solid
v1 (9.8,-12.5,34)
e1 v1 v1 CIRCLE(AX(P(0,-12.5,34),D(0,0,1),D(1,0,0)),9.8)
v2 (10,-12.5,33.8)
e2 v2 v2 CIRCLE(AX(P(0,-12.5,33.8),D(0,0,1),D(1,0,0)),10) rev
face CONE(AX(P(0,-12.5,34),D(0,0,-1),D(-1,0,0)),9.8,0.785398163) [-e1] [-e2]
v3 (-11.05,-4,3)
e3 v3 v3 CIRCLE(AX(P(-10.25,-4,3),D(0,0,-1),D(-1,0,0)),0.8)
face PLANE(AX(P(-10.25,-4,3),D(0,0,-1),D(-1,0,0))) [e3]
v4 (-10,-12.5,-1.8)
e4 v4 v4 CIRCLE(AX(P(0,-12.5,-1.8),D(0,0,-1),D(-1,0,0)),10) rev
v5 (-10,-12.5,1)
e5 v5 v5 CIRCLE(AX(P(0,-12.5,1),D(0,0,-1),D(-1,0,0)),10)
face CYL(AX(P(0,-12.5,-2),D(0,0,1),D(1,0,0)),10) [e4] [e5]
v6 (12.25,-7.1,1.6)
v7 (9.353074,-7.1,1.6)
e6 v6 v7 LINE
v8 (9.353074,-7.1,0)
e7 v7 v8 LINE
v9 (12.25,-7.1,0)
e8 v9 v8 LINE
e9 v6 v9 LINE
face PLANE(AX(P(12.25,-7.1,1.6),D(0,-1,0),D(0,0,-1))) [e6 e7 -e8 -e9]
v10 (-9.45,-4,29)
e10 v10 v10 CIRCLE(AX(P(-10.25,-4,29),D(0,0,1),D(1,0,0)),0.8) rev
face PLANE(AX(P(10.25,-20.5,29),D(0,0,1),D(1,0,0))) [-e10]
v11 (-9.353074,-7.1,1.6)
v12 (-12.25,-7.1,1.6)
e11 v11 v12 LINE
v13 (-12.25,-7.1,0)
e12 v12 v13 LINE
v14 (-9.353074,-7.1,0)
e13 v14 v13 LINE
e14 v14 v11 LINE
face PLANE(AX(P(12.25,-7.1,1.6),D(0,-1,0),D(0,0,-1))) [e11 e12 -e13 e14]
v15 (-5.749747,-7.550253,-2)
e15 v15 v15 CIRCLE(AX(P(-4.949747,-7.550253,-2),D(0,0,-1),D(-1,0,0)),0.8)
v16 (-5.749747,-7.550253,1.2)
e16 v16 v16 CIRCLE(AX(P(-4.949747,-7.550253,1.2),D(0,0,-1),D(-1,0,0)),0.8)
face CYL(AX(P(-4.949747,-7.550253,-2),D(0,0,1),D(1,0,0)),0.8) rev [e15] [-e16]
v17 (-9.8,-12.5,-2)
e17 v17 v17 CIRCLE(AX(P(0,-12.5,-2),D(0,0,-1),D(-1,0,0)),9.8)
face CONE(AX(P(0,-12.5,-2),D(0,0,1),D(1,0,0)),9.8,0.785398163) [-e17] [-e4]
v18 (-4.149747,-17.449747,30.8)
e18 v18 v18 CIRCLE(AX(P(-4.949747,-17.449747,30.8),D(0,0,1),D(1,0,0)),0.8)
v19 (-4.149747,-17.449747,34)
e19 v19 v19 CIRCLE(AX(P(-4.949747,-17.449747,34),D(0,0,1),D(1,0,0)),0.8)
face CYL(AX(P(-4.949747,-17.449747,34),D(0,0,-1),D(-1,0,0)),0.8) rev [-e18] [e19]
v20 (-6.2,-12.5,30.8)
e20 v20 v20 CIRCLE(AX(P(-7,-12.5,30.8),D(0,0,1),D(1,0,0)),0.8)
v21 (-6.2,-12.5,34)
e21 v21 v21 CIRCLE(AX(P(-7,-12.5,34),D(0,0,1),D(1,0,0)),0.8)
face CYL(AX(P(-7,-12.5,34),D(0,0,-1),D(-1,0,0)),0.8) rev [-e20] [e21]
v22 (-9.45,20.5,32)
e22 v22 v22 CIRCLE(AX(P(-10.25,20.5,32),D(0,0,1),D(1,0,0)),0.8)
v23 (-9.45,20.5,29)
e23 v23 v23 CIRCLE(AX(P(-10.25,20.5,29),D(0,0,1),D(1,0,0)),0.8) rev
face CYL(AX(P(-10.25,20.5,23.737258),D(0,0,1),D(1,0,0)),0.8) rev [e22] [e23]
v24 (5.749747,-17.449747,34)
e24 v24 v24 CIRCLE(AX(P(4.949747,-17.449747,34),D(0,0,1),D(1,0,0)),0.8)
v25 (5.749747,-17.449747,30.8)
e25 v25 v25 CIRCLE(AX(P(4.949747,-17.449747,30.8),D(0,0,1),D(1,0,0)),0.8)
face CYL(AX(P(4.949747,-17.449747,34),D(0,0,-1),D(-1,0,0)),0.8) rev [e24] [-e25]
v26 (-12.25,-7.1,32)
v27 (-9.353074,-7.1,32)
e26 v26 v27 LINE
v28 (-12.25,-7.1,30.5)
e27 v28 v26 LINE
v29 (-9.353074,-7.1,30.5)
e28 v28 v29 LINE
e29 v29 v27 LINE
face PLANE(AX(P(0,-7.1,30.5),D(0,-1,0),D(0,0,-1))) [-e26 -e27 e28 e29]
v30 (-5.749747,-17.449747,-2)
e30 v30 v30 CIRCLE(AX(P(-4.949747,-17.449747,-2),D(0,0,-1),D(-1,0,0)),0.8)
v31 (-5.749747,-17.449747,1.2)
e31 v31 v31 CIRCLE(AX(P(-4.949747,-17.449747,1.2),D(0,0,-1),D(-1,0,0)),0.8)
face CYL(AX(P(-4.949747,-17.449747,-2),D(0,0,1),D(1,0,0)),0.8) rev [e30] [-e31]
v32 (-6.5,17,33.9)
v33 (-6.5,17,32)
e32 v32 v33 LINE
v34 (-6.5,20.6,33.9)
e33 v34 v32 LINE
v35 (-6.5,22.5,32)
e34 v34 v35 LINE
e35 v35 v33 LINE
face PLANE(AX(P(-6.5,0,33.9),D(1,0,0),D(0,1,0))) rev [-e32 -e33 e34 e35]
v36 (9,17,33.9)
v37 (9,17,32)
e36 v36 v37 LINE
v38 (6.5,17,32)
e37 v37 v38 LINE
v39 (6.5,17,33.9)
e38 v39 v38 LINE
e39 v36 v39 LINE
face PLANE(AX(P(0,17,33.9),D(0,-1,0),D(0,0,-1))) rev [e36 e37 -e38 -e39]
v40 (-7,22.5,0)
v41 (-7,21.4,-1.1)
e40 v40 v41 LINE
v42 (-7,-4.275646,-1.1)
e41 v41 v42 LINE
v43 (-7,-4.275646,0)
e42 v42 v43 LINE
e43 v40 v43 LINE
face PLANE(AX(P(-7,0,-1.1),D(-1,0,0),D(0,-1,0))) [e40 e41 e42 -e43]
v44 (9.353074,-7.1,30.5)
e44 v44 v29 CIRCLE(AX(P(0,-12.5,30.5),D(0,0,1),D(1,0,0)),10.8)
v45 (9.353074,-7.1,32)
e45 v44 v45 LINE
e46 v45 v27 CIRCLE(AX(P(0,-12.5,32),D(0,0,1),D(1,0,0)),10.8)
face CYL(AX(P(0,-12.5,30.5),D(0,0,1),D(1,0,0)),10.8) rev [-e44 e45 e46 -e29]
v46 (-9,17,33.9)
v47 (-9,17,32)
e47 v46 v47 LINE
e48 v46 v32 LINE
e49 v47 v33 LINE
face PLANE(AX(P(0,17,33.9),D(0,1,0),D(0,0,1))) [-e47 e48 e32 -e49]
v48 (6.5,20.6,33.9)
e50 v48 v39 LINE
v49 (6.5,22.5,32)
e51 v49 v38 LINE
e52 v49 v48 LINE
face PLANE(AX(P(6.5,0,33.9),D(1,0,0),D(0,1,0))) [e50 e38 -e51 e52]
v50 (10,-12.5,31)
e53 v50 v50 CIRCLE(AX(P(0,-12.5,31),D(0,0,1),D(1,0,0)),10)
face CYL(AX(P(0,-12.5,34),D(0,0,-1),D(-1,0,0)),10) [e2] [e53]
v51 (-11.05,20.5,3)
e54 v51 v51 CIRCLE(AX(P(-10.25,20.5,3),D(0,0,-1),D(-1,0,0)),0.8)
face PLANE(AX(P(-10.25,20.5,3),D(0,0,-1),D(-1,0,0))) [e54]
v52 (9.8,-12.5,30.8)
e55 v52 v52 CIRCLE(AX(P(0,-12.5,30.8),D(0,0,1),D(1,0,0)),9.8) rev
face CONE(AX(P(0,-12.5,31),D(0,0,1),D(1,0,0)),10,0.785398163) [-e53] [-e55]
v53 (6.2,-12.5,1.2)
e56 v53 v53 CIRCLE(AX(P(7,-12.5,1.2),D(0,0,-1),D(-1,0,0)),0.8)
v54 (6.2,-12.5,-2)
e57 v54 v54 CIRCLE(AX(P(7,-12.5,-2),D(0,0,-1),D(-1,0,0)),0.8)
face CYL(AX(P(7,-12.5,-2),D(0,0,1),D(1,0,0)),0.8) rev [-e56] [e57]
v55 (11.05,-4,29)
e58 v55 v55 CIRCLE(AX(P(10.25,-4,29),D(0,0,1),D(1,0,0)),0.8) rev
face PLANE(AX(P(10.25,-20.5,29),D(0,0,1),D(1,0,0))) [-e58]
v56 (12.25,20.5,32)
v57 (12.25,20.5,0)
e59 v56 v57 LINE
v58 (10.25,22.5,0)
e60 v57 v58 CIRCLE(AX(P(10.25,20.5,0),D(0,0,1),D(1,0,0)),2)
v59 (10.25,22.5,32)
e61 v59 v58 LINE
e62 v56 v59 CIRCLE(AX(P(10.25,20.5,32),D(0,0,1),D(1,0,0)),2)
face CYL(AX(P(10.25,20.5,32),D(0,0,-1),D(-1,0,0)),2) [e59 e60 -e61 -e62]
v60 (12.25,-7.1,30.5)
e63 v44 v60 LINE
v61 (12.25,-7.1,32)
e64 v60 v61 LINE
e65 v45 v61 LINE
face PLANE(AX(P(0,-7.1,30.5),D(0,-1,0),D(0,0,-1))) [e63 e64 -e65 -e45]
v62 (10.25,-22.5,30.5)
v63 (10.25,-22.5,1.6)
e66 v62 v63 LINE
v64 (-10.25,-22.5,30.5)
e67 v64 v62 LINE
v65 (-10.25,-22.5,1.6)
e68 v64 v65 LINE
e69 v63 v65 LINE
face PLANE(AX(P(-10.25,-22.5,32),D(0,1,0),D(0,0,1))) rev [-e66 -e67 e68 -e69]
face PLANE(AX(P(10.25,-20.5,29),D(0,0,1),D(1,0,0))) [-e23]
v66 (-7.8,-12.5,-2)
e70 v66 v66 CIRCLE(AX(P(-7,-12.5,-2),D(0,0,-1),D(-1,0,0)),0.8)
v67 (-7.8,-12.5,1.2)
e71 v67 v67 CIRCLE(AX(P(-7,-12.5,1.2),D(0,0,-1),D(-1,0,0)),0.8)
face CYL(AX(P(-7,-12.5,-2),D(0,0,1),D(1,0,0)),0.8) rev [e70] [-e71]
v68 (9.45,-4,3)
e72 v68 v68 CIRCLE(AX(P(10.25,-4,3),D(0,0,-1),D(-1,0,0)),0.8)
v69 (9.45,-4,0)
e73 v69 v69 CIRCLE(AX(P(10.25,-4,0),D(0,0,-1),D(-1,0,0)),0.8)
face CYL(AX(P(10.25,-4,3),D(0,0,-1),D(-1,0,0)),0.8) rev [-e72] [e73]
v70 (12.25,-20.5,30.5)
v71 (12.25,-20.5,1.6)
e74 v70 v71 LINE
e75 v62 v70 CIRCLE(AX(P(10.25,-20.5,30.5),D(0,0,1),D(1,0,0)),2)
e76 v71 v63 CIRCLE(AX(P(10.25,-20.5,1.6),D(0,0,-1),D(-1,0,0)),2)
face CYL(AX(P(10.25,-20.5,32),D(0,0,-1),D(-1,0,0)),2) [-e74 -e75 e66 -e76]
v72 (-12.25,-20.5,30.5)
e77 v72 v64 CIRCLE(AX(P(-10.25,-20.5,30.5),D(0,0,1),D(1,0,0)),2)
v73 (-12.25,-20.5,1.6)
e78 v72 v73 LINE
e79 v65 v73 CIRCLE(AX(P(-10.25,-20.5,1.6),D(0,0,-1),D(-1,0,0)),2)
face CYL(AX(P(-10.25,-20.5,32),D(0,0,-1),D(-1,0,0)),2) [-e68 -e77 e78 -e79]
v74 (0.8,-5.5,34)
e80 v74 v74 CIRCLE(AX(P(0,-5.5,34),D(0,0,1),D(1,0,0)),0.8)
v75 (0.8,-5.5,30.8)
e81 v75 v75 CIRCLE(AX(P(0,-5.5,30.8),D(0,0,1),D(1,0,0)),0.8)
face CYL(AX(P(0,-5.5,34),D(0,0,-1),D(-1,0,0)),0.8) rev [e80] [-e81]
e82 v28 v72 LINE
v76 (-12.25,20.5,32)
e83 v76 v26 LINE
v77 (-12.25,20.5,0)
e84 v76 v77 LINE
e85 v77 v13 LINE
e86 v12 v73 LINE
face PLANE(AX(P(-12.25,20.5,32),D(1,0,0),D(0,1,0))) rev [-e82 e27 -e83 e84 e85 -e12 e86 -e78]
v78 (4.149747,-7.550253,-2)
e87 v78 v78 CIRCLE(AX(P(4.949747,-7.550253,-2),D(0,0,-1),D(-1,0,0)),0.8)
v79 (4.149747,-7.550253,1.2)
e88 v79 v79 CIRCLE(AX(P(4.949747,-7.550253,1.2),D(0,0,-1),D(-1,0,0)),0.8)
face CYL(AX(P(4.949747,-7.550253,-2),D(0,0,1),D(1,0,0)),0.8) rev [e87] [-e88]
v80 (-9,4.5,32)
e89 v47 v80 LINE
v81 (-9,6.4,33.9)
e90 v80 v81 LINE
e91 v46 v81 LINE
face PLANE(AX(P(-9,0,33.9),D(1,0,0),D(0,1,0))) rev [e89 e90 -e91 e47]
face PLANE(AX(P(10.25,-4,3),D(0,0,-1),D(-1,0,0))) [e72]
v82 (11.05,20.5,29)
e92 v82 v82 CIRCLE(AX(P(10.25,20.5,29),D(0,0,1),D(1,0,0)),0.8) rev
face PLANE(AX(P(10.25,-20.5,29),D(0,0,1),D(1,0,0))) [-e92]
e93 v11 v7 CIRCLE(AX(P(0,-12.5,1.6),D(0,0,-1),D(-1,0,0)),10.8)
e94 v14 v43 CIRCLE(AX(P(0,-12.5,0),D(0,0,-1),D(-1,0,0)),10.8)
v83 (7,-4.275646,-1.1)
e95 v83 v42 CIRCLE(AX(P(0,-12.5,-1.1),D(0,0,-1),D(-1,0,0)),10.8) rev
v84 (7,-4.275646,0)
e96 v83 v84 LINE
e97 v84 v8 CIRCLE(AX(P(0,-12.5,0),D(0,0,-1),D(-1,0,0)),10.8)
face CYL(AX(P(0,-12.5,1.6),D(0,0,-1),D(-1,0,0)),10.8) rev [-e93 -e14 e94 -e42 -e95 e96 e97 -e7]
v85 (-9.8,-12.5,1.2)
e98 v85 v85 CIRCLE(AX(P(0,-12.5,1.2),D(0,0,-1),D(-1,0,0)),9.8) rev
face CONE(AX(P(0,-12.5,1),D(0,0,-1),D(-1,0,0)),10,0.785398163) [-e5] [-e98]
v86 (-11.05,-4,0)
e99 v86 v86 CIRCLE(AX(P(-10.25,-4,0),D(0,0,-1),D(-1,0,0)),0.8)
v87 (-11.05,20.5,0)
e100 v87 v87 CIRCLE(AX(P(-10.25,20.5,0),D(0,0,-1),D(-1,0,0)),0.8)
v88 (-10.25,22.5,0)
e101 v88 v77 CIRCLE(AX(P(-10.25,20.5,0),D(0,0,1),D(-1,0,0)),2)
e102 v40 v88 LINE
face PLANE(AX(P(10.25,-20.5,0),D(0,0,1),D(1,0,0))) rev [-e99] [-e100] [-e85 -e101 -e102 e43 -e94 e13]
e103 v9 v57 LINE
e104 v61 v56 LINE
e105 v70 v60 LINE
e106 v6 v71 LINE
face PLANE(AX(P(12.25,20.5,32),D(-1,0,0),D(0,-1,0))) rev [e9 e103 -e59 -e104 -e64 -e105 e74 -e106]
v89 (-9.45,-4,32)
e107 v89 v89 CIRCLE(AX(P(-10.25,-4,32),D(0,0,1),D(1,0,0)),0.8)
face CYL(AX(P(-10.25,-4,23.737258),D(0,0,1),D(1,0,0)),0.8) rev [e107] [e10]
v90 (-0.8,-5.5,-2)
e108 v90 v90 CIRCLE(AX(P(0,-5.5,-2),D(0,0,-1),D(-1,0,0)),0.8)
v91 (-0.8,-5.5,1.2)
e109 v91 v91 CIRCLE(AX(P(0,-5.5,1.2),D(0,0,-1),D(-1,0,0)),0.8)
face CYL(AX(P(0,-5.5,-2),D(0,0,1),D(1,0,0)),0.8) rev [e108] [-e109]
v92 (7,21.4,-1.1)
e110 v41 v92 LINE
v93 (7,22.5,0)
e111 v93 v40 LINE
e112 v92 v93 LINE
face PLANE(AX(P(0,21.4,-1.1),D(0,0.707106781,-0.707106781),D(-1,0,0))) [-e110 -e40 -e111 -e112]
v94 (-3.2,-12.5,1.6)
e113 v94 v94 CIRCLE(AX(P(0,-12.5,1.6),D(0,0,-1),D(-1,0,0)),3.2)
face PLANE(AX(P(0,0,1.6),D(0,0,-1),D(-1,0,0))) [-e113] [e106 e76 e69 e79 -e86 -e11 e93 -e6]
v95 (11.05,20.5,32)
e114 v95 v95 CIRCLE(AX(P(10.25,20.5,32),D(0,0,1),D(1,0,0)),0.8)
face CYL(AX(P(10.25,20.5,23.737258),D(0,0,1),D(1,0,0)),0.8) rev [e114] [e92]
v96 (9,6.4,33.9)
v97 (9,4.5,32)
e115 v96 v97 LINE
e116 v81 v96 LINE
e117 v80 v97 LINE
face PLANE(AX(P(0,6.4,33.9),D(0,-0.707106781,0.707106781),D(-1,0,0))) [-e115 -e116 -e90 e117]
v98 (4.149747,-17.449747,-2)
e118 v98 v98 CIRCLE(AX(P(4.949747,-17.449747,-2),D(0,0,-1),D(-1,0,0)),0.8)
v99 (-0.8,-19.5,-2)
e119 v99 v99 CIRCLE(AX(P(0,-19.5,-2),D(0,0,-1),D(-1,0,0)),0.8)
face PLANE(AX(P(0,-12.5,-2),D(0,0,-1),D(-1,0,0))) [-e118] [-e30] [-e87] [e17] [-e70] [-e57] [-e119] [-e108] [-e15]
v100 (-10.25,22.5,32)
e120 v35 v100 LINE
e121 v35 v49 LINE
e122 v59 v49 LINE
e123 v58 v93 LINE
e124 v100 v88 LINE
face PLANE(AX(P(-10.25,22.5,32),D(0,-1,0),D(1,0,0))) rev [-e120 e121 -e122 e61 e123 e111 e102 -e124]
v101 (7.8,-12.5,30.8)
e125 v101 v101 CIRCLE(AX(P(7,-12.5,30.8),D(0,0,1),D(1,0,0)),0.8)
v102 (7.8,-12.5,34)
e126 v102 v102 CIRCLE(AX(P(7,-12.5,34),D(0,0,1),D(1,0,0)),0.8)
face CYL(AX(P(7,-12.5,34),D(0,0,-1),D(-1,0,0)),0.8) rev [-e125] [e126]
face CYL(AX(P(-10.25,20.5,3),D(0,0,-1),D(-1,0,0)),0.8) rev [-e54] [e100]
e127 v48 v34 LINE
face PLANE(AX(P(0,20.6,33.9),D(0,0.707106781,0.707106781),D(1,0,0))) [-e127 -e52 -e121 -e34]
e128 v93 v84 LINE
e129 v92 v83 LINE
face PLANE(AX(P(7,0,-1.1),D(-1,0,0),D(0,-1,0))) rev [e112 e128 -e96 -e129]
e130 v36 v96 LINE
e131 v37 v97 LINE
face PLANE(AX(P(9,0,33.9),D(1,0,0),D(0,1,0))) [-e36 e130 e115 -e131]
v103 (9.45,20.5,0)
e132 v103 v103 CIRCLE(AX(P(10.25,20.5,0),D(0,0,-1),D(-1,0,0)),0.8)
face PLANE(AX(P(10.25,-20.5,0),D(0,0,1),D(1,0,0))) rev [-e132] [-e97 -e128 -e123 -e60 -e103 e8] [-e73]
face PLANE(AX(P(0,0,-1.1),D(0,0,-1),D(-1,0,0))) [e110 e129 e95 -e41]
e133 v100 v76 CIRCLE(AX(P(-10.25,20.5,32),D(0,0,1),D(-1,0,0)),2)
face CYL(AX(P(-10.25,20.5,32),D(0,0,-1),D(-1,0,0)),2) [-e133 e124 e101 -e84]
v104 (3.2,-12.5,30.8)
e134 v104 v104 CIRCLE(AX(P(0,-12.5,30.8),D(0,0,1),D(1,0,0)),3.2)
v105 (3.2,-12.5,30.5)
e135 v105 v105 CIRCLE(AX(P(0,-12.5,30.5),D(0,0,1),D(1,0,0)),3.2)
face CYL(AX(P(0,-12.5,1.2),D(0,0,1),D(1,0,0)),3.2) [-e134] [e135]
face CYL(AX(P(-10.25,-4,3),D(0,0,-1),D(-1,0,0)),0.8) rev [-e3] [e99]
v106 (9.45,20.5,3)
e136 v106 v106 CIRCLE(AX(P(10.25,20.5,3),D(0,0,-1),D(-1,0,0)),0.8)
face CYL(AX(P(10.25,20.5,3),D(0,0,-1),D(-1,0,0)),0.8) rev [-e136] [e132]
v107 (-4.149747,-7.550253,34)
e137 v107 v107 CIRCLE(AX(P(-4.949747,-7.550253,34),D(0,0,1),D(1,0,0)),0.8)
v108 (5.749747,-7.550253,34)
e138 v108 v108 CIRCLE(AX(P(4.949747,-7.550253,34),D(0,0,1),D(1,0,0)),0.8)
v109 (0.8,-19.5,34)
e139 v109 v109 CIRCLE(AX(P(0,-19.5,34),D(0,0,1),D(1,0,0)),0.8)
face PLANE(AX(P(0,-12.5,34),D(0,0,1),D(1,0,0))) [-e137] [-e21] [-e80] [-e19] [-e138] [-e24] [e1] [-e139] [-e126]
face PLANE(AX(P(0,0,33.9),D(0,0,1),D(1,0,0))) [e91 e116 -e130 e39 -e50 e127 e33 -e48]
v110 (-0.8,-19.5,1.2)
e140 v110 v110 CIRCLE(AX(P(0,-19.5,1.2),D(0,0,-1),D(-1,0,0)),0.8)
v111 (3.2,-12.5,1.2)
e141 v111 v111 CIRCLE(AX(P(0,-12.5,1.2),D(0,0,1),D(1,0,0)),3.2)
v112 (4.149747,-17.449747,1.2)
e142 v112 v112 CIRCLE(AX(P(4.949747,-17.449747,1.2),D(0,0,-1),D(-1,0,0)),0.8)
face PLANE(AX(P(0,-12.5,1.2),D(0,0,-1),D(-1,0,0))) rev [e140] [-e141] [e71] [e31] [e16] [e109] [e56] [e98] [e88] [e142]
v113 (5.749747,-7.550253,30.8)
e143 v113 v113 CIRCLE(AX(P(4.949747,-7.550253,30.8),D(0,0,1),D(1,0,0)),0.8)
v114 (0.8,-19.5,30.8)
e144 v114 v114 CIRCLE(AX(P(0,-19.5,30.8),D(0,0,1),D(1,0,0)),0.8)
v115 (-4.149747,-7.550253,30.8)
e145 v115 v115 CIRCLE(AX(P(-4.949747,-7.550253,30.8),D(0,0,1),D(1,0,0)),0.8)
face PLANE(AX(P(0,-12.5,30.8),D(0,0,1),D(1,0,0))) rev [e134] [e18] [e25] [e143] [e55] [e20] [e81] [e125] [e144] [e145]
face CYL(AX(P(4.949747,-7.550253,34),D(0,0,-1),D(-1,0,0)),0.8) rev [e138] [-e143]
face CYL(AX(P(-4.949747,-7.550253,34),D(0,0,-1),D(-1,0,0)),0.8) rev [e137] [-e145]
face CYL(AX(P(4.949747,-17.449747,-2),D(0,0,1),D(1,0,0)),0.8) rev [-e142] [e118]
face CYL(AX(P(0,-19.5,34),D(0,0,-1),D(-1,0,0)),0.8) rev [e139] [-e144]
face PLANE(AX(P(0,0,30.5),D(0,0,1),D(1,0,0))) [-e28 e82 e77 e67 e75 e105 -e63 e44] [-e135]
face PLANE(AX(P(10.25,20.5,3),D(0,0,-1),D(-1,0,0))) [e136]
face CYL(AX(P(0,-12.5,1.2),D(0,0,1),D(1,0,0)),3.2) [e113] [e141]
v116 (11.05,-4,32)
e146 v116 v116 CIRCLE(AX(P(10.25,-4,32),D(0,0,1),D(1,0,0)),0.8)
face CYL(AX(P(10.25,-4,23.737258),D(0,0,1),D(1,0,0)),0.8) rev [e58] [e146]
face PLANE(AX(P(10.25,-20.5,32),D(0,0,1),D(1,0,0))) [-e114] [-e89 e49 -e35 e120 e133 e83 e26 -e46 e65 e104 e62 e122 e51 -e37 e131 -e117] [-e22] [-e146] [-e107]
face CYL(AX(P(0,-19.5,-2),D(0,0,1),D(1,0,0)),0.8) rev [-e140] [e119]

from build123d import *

# Parameters (mm, degrees)
BOSS_EXTRUDE1_DEPTH      = 32
CUT_EXTRUDE1_START       = -1.5
CUT_EXTRUDE1_DEPTH       = 1.5
SKETCH3_R                = 10.8
SKETCH3_W                = 24.5
SKETCH3_H                = 15.4
CUT_EXTRUDE2_DEPTH       = 1.6
BOSS_EXTRUDE2_DEPTH      = 0.3
BOSS_EXTRUDE2_DEPTH_BACK = 29.3
SKETCH4_R                = 3.2
SKETCH5_R                = 10
SKETCH5_R_2              = 0.8
BOSS_EXTRUDE3_DEPTH      = 3.2
BOSS_EXTRUDE5_START      = 3.2
SKETCH6_R                = 10
SKETCH6_R_2              = 0.8
BOSS_EXTRUDE5_DEPTH      = 3.2
BOSS_EXTRUDE6_DEPTH      = 1.9
CHAMFER1_SIZE            = 1.9
BOSS_EXTRUDE7_START      = 1.1
BOSS_EXTRUDE7_DEPTH      = 1.1
CHAMFER2_SIZE            = 1.1
SKETCH9_R                = 0.8
CUT_EXTRUDE3_DEPTH       = 3
CUT_EXTRUDE4_START       = -3
SKETCH10_R               = 0.8
CUT_EXTRUDE4_DEPTH       = 3
CHAMFER3_SIZE            = 0.2


with BuildPart() as part:
    # Sketch1 → Boss-Extrude1 (new body)
    with BuildSketch(Plane.XY):
        with BuildLine():
            Line((-10.25, 22.5), (10.25, 22.5))
            ThreePointArc((10.25, 22.5), (11.664213562, 21.914213562), (12.25, 20.5))
            Line((12.25, 20.5), (12.25, -20.5))
            ThreePointArc((12.25, -20.5), (11.664213562, -21.914213562), (10.25, -22.5))
            Line((10.25, -22.5), (-10.25, -22.5))
            ThreePointArc((-10.25, -22.5), (-11.664213562, -21.914213562), (-12.25, -20.5))
            Line((-12.25, -20.5), (-12.25, 20.5))
            ThreePointArc((-12.25, 20.5), (-11.664213562, 21.914213562), (-10.25, 22.5))
        make_face()
    extrude(amount=BOSS_EXTRUDE1_DEPTH)

    # Sketch2 → Cut-Extrude1 (cut)
    with BuildSketch(Plane.XY.offset(32).offset(CUT_EXTRUDE1_START)):
        with BuildLine():
            ThreePointArc((9.353074361, -7.1), (0, -1.7), (-9.353074361, -7.1))
            Line((-9.353074361, -7.1), (9.353074361, -7.1))
        make_face()
        with BuildLine():
            Line((9.353074361, -7.1), (-9.353074361, -7.1))
            ThreePointArc((-9.353074361, -7.1), (-10.217465609, -15.99905652), (-4.079215611, -22.5))
            Line((-4.079215611, -22.5), (4.079215611, -22.5))
            ThreePointArc((4.079215611, -22.5), (8.963691444, -18.524303752), (10.8, -12.5))
            ThreePointArc((10.8, -12.5), (10.431998924, -9.704754313), (9.353074361, -7.1))
        make_face()
        with BuildLine():
            Line((12.25, -7.1), (9.353074361, -7.1))
            ThreePointArc((9.353074361, -7.1), (10.431998924, -9.704754313), (10.8, -12.5))
            ThreePointArc((10.8, -12.5), (8.963691444, -18.524303752), (4.079215611, -22.5))
            Line((4.079215611, -22.5), (10.25, -22.5))
            ThreePointArc((10.25, -22.5), (11.664213562, -21.914213562), (12.25, -20.5))
            Line((12.25, -20.5), (12.25, -7.1))
        make_face()
        with BuildLine():
            Line((-9.353074361, -7.1), (-12.25, -7.1))
            Line((-12.25, -7.1), (-12.25, -20.5))
            ThreePointArc((-12.25, -20.5), (-11.664213562, -21.914213562), (-10.25, -22.5))
            Line((-10.25, -22.5), (-4.079215611, -22.5))
            ThreePointArc((-4.079215611, -22.5), (-10.217465609, -15.99905652), (-9.353074361, -7.1))
        make_face()
    extrude(amount=CUT_EXTRUDE1_DEPTH, mode=Mode.SUBTRACT)

    # Sketch3 → Cut-Extrude2 (cut)
    with BuildSketch(Plane(origin=(0, 0, 0), x_dir=(-1, 0, 0), z_dir=(0, 0, -1))):
        with Locations((0, -12.5)):
            Circle(SKETCH3_R)
        with Locations((0, -14.8)):
            Rectangle(SKETCH3_W, SKETCH3_H)
    extrude(amount=-CUT_EXTRUDE2_DEPTH, mode=Mode.SUBTRACT)

    # Sketch4 → Boss-Extrude2 (add, two sides: drawn at the far end of the back side and taken through both)
    with BuildSketch(Plane.XY.offset(30.5).offset(-BOSS_EXTRUDE2_DEPTH_BACK)):
        with Locations((0, -12.5)):
            Circle(SKETCH4_R)
    extrude(amount=BOSS_EXTRUDE2_DEPTH + BOSS_EXTRUDE2_DEPTH_BACK)

    # Sketch5 → Boss-Extrude3 (add)
    with BuildSketch(Plane.XY.offset(30.8)):
        with Locations((0, -12.5)):
            Circle(SKETCH5_R)
        with Locations((0, -5.5)):
            Circle(SKETCH5_R_2, mode=Mode.SUBTRACT)
        with Locations((4.949747468, -7.550252532)):
            Circle(SKETCH5_R_2, mode=Mode.SUBTRACT)
        with Locations((7, -12.5)):
            Circle(SKETCH5_R_2, mode=Mode.SUBTRACT)
        with Locations((4.949747468, -17.449747468)):
            Circle(SKETCH5_R_2, mode=Mode.SUBTRACT)
        with Locations((0, -19.5)):
            Circle(SKETCH5_R_2, mode=Mode.SUBTRACT)
        with Locations((-4.949747468, -17.449747468)):
            Circle(SKETCH5_R_2, mode=Mode.SUBTRACT)
        with Locations((-7, -12.5)):
            Circle(SKETCH5_R_2, mode=Mode.SUBTRACT)
        with Locations((-4.949747468, -7.550252532)):
            Circle(SKETCH5_R_2, mode=Mode.SUBTRACT)
    extrude(amount=BOSS_EXTRUDE3_DEPTH)

    # Sketch6 → Boss-Extrude5 (add)
    with BuildSketch(Plane(origin=(0, 0, 1.2), x_dir=(-1, 0, 0), z_dir=(0, 0, -1)).offset(BOSS_EXTRUDE5_START)):
        with Locations(Location((0, -12.5, 0), (0, 0, 180))):
            Circle(SKETCH6_R)
        with Locations(Location((0, -5.5, 0), (0, 0, 180))):
            Circle(SKETCH6_R_2, mode=Mode.SUBTRACT)
        with Locations(Location((4.949747468, -7.550252532, 0), (0, 0, 180))):
            Circle(SKETCH6_R_2, mode=Mode.SUBTRACT)
        with Locations(Location((7, -12.5, 0), (0, 0, 180))):
            Circle(SKETCH6_R_2, mode=Mode.SUBTRACT)
        with Locations(Location((4.949747468, -17.449747468, 0), (0, 0, 180))):
            Circle(SKETCH6_R_2, mode=Mode.SUBTRACT)
        with Locations(Location((0, -19.5, 0), (0, 0, 180))):
            Circle(SKETCH6_R_2, mode=Mode.SUBTRACT)
        with Locations(Location((-4.949747468, -17.449747468, 0), (0, 0, 180))):
            Circle(SKETCH6_R_2, mode=Mode.SUBTRACT)
        with Locations(Location((-7, -12.5, 0), (0, 0, 180))):
            Circle(SKETCH6_R_2, mode=Mode.SUBTRACT)
        with Locations(Location((-4.949747468, -7.550252532, 0), (0, 0, 180))):
            Circle(SKETCH6_R_2, mode=Mode.SUBTRACT)
    extrude(amount=-BOSS_EXTRUDE5_DEPTH)

    # Sketch7 → Boss-Extrude6 (add)
    with BuildSketch(Plane.XY.offset(32)):
        Polygon((6.5, 22.5), (-6.5, 22.5), (-6.5, 17), (-9, 17), (-9, 4.5), (9, 4.5), (9, 17), (6.5, 17), align=None)
    extrude(amount=BOSS_EXTRUDE6_DEPTH)

    # Chamfer1
    chamfer1_edges = [part.edges().sort_by_distance(p)[0] for p in [
        (0, 22.5, 33.9),
        (0, 4.5, 33.9),
    ]]
    chamfer(chamfer1_edges, length=CHAMFER1_SIZE - 0.0001)  # a hair under: the kernel refuses the full size

    # Sketch8 → Boss-Extrude7 (add)
    with BuildSketch(Plane(origin=(0, 0, 0), x_dir=(-1, 0, 0), z_dir=(0, 0, -1)).offset(BOSS_EXTRUDE7_START)):
        with BuildLine():
            Line((7, 22.5), (-7, 22.5))
            Line((-7, 22.5), (-7, -4.275645922))
            ThreePointArc((-7, -4.275645922), (0, -1.7), (7, -4.275645922))
            Line((7, -4.275645922), (7, 22.5))
        make_face()
    extrude(amount=-BOSS_EXTRUDE7_DEPTH)

    # Chamfer2
    chamfer2_edges = [part.edges().sort_by_distance(p)[0] for p in [
        (0, 22.5, -1.1),
    ]]
    chamfer(chamfer2_edges, length=CHAMFER2_SIZE)

    # Sketch9 → Cut-Extrude3 (cut)
    with BuildSketch(Plane.XY.offset(32)):
        with Locations((-10.25, 20.5)):
            Circle(SKETCH9_R)
        with Locations((10.25, 20.5)):
            Circle(SKETCH9_R)
        with Locations((-10.25, -4)):
            Circle(SKETCH9_R)
        with Locations((10.25, -4)):
            Circle(SKETCH9_R)
    extrude(amount=-CUT_EXTRUDE3_DEPTH, mode=Mode.SUBTRACT)

    # Sketch10 → Cut-Extrude4 (cut)
    with BuildSketch(Plane(origin=(0, 0, 0), x_dir=(-1, 0, 0), z_dir=(0, 0, -1)).offset(CUT_EXTRUDE4_START)):
        with Locations(Location((-10.25, 20.5, 0), (0, 0, 180))):
            Circle(SKETCH10_R)
        with Locations(Location((10.25, 20.5, 0), (0, 0, 180))):
            Circle(SKETCH10_R)
        with Locations(Location((-10.25, -4, 0), (0, 0, 180))):
            Circle(SKETCH10_R)
        with Locations(Location((10.25, -4, 0), (0, 0, 180))):
            Circle(SKETCH10_R)
    extrude(amount=CUT_EXTRUDE4_DEPTH, mode=Mode.SUBTRACT)

    # Chamfer3
    chamfer3_edges = [part.edges().sort_by_distance(p)[0] for p in [
        (-10, -12.5, -2),
        (-10, -12.5, 1.2),
        (-10, -12.5, 34),
        (-10, -12.5, 30.8),
    ]]
    chamfer(chamfer3_edges, length=CHAMFER3_SIZE)


solid = part.part
